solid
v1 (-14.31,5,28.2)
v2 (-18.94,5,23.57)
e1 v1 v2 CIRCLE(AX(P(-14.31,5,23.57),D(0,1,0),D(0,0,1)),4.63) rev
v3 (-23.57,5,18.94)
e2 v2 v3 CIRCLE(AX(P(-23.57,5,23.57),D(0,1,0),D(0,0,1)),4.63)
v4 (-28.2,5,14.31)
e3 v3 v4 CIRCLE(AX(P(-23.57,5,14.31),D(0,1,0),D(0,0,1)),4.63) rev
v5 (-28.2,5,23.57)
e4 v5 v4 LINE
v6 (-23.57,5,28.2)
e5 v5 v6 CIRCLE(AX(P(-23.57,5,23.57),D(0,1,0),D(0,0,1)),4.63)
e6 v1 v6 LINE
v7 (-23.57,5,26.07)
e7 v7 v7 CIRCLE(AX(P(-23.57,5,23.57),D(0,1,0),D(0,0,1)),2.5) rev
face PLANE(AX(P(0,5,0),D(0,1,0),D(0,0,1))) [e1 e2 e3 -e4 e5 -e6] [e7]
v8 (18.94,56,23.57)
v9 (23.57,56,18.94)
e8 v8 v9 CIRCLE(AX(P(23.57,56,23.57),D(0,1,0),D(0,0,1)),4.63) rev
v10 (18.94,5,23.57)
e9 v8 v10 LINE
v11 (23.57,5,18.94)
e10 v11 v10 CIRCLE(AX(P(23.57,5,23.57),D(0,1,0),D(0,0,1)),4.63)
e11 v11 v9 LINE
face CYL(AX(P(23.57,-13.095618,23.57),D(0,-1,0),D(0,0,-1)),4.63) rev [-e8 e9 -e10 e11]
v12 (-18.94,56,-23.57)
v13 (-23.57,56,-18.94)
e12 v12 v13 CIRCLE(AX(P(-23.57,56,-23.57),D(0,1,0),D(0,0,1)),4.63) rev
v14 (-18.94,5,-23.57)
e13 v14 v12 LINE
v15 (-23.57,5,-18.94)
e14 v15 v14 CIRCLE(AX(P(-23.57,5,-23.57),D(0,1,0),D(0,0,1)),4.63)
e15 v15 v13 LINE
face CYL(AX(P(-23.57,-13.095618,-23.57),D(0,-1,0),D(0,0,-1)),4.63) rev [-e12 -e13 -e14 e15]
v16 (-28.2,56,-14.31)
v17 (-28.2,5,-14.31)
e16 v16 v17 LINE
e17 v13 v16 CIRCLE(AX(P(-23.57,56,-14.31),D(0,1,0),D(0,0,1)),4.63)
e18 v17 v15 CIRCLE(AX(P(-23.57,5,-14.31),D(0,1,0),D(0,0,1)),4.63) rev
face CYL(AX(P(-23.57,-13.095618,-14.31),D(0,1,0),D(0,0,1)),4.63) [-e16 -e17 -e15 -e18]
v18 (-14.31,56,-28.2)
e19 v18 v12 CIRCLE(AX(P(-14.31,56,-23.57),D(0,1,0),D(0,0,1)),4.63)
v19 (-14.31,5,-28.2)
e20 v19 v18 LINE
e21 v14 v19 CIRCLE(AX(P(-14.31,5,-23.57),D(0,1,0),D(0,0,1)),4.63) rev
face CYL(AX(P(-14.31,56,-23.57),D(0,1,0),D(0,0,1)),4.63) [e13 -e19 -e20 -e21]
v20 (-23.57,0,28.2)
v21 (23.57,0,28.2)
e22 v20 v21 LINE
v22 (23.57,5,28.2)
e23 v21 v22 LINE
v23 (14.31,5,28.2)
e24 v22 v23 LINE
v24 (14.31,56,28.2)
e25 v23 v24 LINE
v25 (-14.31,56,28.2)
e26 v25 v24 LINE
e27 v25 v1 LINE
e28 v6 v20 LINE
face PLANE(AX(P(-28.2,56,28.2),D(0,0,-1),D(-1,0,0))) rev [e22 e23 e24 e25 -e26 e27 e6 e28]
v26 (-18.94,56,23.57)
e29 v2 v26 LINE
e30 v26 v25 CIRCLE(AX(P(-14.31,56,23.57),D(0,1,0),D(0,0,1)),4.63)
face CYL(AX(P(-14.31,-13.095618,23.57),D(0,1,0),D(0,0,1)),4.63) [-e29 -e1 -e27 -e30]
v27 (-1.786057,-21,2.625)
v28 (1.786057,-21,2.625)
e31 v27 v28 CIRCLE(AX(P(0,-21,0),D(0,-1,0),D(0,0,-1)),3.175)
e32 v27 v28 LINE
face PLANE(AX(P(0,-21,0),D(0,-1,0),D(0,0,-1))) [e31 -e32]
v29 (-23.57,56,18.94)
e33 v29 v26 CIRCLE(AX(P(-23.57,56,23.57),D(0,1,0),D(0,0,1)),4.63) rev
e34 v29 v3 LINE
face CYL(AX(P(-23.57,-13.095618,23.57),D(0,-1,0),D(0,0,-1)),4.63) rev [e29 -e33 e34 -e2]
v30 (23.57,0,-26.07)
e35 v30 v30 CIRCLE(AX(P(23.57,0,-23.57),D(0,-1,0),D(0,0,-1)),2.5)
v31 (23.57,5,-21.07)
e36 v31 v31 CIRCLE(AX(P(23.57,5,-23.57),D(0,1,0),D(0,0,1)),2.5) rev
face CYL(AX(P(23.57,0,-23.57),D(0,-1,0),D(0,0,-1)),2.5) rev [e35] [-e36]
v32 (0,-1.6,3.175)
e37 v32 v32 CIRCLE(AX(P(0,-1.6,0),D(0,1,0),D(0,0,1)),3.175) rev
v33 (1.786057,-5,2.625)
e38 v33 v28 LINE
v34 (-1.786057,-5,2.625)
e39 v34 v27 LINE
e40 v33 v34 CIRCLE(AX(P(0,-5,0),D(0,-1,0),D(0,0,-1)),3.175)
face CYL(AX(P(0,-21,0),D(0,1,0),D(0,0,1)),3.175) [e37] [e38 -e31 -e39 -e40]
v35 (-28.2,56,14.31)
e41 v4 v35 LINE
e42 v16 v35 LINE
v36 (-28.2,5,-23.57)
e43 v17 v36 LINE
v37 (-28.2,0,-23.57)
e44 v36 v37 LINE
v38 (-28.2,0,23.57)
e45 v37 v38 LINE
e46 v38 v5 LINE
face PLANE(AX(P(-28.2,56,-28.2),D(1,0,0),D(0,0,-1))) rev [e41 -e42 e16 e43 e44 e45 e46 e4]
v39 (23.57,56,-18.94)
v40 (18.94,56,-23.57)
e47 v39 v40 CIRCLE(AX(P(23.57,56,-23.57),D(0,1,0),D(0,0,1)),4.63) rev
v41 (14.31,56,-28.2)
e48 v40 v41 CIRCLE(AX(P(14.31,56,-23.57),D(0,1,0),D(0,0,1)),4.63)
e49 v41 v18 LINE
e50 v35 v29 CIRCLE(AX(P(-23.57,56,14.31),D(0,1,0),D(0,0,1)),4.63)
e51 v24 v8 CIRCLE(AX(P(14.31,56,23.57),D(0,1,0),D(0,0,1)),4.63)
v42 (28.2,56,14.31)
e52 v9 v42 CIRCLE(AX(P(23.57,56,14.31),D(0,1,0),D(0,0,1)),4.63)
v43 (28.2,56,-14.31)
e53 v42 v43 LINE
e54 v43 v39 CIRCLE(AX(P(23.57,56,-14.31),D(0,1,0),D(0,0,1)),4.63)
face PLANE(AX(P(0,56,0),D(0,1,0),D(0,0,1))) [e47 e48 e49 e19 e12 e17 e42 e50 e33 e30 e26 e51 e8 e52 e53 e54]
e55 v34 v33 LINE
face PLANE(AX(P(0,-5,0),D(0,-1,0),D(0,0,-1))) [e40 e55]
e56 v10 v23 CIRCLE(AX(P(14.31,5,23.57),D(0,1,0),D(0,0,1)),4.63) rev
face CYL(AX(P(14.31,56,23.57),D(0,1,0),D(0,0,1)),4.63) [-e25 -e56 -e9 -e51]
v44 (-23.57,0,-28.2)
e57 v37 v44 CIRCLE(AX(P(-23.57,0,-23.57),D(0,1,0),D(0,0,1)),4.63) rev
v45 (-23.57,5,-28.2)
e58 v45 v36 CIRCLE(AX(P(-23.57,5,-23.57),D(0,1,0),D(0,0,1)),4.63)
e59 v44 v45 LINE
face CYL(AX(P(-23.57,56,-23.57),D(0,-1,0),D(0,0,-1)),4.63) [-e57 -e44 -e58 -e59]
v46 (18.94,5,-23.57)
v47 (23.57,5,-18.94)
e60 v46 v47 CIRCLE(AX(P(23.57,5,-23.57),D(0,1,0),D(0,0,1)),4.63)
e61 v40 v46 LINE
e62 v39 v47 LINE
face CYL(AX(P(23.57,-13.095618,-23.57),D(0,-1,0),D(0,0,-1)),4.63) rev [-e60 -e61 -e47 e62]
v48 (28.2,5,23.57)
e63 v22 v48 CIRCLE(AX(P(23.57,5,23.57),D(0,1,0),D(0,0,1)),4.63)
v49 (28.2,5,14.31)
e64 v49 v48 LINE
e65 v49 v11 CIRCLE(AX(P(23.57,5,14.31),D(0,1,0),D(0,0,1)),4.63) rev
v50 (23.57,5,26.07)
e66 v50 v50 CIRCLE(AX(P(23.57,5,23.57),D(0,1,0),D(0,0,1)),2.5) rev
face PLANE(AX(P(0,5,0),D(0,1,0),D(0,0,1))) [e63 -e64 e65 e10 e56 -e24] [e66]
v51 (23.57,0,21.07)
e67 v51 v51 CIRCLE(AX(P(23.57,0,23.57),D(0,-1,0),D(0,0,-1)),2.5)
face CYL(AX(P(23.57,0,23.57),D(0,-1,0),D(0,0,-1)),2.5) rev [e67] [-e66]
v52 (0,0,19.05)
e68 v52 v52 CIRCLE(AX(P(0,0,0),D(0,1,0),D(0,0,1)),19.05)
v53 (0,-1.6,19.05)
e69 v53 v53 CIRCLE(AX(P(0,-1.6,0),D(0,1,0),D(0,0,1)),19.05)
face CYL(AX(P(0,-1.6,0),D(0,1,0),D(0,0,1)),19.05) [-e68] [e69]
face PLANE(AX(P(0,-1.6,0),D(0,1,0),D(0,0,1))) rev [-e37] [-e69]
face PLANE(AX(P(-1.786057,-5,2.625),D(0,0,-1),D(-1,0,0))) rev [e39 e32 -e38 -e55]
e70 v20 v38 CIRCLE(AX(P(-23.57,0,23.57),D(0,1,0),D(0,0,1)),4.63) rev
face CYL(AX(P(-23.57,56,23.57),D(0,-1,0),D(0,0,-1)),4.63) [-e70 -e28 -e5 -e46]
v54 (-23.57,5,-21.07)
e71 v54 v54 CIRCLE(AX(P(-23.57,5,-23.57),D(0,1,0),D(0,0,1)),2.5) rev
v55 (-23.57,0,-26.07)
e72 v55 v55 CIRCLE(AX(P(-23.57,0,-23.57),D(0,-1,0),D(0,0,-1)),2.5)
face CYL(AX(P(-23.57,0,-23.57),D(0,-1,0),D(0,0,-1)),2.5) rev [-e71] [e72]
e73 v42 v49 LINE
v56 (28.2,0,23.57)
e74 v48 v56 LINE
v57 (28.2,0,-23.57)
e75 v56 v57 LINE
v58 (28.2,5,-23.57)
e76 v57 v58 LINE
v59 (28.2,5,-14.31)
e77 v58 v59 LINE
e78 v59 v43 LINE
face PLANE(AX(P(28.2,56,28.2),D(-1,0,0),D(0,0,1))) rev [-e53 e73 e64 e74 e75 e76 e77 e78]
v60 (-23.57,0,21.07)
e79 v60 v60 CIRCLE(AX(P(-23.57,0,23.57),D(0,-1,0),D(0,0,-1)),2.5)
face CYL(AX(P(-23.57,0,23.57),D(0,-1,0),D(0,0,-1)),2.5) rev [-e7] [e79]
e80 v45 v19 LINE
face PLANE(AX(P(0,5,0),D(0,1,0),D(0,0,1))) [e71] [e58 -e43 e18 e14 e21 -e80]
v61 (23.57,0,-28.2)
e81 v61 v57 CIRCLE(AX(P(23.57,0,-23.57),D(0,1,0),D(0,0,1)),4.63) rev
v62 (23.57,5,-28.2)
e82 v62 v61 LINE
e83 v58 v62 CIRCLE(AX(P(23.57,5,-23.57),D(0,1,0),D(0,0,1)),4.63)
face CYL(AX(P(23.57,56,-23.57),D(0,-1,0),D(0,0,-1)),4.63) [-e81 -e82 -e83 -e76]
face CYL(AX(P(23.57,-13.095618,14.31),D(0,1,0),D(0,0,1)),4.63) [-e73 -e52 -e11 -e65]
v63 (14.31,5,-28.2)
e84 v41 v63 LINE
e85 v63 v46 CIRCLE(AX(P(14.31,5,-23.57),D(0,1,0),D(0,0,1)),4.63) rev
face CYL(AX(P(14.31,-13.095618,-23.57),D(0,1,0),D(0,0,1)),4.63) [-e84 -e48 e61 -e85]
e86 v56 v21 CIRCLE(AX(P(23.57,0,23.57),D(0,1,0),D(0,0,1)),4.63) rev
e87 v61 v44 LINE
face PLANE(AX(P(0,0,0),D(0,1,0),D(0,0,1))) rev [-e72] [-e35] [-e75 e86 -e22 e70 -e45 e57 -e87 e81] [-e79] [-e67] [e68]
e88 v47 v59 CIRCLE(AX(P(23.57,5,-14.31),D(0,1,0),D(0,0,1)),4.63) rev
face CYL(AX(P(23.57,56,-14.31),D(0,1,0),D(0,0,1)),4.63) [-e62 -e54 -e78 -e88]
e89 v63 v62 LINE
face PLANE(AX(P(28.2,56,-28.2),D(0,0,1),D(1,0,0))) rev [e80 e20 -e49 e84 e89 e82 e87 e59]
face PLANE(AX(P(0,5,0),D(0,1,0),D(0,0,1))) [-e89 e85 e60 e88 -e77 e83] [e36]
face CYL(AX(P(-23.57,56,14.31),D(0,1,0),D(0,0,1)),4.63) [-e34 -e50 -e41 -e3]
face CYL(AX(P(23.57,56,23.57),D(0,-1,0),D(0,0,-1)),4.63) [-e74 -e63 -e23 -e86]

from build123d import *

# Parameters (mm, degrees)
SKETCH1_W                = 56.4
SKETCH1_H                = 56.4
BOSS_EXTRUDE1_DEPTH      = 56
SKETCH2_R                = 19.05
BOSS_EXTRUDE2_DEPTH      = 1.6
SKETCH3_R                = 3.175
BOSS_EXTRUDE3_DEPTH      = 19.4
CUT_EXTRUDE1_START       = -16
CUT_EXTRUDE1_DEPTH       = 16
F_5_0_5_DIAMETER_HOLE1_D = 5
SKETCH8_W                = 9.26
SKETCH8_H                = 9.26
CUT_EXTRUDE2_DEPTH       = 51
FILLET1_R                = 4.63


with BuildPart() as part:
    # Sketch1 → Boss-Extrude1 (new body)
    with BuildSketch(Plane(origin=(0, 0, 0), x_dir=(1, 0, 0), z_dir=(0, 1, 0))):
        Rectangle(SKETCH1_W, SKETCH1_H)
    extrude(amount=BOSS_EXTRUDE1_DEPTH)

    # Sketch2 → Boss-Extrude2 (add)
    with BuildSketch(Plane(origin=(0, 0, 0), x_dir=(1, 0, 0), z_dir=(0, 1, 0))):
        with Locations(Location((0, 0, 0), (0, 0, 270))):
            Circle(SKETCH2_R)
    extrude(amount=-BOSS_EXTRUDE2_DEPTH)

    # Sketch3 → Boss-Extrude3 (add)
    with BuildSketch(Plane.XZ.offset(1.6)):
        with Locations(Location((0, 0, 0), (0, 0, 90))):
            Circle(SKETCH3_R)
    extrude(amount=BOSS_EXTRUDE3_DEPTH)

    # Sketch4 → Cut-Extrude1 (cut)
    with BuildSketch(Plane.XZ.offset(21).offset(CUT_EXTRUDE1_START)):
        with BuildLine():
            Line((-1.78605711, 2.625), (1.78605711, 2.625))
            ThreePointArc((1.78605711, 2.625), (0, 3.175), (-1.78605711, 2.625))
        make_face()
    extrude(amount=CUT_EXTRUDE1_DEPTH, mode=Mode.SUBTRACT)

    # Ø5.0 (5) Diameter Hole1 (through all)
    with Locations(Plane(origin=(0, 0, 0), x_dir=(-1, 0, 0), z_dir=(0, -1, 0))):
        with Locations((-23.57, 23.569999995), (23.57, 23.57), (23.570000005, -23.57), (-23.569999995, -23.570000005)):
            Hole(F_5_0_5_DIAMETER_HOLE1_D / 2)

    # Sketch8 → Cut-Extrude2 (cut)
    with BuildSketch(Plane(origin=(0, 56, 0), x_dir=(1, 0, 0), z_dir=(0, 1, 0))):
        with Locations((-23.57, 23.57)):
            Rectangle(SKETCH8_W, SKETCH8_H)
        with Locations((23.57, 23.57)):
            Rectangle(SKETCH8_W, SKETCH8_H)
        with Locations((23.57, -23.57)):
            Rectangle(SKETCH8_W, SKETCH8_H)
        with Locations((-23.57, -23.57)):
            Rectangle(SKETCH8_W, SKETCH8_H)
    extrude(amount=-CUT_EXTRUDE2_DEPTH, mode=Mode.SUBTRACT)

    # Fillet1
    fillet1_edges = [part.edges().sort_by_distance(p)[0] for p in [
        (28.2, 2.5, 28.2),
        (28.2, 2.5, -28.2),
        (18.94, 30.5, -28.2),
        (28.2, 30.5, -18.94),
        (18.94, 30.5, -18.94),
        (18.94, 30.5, 18.94),
        (18.94, 30.5, 28.2),
        (28.2, 30.5, 18.94),
        (-18.94, 30.5, 18.94),
        (-18.94, 30.5, 28.2),
        (-28.2, 2.5, 28.2),
        (-28.2, 30.5, 18.94),
        (-18.94, 30.5, -28.2),
        (-28.2, 30.5, -18.94),
        (-28.2, 2.5, -28.2),
        (-18.94, 30.5, -18.94),
    ]]
    fillet(fillet1_edges, radius=FILLET1_R - 0.0001)  # a hair under: the kernel refuses the full size


solid = part.part
